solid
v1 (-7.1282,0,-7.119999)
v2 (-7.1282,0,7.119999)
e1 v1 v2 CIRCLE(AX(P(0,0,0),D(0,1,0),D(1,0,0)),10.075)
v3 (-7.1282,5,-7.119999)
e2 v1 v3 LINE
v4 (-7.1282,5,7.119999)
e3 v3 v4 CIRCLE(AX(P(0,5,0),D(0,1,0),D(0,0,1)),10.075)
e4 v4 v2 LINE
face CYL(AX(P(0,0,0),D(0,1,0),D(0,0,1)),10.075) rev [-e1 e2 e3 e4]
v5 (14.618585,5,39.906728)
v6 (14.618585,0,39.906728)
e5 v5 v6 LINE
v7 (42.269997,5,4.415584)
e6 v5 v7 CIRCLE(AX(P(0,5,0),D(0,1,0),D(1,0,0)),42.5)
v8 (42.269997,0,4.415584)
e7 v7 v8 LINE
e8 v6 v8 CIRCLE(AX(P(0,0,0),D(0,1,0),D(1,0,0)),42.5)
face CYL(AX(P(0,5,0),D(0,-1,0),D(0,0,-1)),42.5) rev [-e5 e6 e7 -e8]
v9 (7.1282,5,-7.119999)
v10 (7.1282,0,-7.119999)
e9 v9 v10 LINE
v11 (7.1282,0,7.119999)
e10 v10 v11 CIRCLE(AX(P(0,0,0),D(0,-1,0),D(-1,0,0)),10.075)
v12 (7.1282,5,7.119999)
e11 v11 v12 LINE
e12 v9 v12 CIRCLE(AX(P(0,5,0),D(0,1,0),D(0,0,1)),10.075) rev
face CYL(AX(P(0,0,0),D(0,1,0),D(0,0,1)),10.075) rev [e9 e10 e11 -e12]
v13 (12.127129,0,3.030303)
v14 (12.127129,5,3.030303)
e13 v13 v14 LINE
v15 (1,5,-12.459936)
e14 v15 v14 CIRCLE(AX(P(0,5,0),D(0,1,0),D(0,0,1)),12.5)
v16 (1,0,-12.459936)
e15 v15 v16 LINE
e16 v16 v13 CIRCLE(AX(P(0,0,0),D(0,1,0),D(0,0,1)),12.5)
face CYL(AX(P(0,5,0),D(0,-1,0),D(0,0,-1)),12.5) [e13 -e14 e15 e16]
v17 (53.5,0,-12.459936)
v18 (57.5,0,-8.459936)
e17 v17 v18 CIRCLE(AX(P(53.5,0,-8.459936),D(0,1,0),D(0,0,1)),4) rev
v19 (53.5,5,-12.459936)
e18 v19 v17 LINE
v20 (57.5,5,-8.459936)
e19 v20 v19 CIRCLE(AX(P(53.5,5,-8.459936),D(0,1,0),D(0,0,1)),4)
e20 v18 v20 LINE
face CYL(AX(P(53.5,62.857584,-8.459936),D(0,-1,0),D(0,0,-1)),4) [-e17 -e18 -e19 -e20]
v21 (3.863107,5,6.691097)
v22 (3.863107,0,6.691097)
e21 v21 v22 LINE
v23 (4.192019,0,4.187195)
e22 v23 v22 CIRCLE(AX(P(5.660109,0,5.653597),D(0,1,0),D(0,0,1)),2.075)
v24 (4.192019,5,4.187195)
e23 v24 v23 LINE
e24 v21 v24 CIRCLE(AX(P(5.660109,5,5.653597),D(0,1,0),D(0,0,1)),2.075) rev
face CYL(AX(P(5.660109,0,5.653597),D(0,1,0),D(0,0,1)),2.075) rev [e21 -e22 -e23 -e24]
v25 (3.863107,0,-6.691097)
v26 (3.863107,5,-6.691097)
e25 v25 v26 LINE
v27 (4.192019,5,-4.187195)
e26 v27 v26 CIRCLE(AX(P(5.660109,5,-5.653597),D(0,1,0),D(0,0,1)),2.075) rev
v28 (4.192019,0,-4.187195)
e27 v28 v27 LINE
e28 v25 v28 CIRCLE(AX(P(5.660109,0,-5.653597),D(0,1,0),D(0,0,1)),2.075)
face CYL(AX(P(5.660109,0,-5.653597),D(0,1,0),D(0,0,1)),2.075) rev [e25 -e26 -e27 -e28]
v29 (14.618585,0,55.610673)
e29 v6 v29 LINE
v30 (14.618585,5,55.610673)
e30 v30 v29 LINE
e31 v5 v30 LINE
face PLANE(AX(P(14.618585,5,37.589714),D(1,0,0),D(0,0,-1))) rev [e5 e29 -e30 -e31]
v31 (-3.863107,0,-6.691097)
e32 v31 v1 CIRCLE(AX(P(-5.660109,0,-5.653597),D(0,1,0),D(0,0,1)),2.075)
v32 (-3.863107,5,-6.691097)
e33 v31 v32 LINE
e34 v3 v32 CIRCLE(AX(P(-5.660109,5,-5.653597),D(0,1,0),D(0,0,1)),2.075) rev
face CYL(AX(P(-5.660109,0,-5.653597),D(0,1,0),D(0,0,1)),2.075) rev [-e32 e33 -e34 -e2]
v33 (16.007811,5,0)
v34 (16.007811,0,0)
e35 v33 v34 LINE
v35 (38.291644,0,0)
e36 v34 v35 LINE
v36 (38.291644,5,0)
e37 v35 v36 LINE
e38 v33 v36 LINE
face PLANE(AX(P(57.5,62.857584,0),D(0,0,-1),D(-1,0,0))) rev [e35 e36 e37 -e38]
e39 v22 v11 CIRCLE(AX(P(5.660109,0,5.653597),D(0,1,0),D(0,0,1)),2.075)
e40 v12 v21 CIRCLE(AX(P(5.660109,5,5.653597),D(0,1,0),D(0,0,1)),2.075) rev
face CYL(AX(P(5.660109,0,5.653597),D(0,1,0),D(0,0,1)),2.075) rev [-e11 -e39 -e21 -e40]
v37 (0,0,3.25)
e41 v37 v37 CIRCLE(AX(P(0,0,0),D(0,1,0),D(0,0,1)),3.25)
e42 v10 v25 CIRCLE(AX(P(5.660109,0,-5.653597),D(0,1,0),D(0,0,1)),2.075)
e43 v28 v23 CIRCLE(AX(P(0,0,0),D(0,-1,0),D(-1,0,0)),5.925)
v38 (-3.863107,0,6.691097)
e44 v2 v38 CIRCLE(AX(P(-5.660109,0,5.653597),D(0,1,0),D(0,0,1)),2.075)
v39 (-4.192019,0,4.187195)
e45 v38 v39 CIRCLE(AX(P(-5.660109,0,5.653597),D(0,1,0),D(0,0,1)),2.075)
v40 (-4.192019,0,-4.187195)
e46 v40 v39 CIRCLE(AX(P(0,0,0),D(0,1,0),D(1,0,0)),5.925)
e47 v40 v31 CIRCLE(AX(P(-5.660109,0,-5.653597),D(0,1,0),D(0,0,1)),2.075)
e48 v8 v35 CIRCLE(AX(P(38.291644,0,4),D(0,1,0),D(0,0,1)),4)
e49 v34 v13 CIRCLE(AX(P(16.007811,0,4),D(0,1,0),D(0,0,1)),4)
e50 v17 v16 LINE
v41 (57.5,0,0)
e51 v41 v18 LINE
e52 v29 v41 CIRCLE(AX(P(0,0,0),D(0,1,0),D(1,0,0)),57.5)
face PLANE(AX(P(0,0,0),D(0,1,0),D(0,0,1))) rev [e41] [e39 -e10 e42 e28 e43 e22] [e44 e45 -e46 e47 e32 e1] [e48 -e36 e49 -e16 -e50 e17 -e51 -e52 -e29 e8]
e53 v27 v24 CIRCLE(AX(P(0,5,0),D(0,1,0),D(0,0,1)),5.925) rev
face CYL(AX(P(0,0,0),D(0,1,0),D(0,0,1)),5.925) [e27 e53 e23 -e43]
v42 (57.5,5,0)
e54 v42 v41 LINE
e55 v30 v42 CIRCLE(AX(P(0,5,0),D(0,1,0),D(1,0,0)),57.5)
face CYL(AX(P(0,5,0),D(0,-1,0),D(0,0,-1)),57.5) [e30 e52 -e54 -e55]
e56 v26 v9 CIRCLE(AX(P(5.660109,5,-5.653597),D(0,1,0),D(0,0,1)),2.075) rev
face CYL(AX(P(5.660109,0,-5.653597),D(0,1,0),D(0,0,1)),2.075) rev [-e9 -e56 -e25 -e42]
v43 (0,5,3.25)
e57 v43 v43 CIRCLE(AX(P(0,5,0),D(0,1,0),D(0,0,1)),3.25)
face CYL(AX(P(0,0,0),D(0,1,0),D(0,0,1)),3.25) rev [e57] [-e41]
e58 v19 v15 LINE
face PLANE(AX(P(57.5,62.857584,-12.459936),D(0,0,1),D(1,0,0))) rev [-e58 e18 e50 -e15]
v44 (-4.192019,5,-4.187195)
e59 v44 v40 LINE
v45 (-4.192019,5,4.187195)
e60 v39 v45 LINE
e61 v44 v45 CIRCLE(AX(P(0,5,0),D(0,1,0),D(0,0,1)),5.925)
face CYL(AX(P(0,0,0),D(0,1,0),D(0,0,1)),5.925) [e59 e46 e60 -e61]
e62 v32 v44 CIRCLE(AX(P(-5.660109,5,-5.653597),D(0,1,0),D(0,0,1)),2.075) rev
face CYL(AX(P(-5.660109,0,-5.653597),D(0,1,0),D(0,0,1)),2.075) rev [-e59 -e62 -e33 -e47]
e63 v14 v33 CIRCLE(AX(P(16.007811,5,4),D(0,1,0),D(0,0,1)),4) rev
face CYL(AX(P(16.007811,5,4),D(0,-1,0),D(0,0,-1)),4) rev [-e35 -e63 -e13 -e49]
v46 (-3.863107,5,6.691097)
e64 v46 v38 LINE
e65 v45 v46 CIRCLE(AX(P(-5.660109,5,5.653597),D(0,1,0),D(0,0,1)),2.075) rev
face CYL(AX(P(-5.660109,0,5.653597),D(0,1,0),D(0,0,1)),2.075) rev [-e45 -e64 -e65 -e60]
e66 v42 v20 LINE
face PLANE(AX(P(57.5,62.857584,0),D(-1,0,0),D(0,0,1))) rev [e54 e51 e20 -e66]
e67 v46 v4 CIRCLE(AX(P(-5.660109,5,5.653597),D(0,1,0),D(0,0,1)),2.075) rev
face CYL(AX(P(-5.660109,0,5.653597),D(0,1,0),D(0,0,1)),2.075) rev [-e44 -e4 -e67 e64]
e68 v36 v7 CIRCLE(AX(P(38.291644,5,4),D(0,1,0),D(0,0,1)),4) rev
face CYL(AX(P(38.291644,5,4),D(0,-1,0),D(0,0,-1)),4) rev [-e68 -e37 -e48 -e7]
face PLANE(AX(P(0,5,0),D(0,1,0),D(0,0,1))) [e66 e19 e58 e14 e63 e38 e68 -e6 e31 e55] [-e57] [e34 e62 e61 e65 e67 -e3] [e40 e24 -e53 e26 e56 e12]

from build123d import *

# Parameters (mm, degrees)
SKETCH1_R               = 12.5
BOSS_EXTRUDE1_DEPTH     = 5
EXTRUDE_THIN1_DEPTH     = 5
SKETCH6_W               = 56.5
SKETCH6_H               = 12.459935794
BOSS_EXTRUDE3_DEPTH     = 5
CUT_EXTRUDE3_DEPTH      = 80.717487022
CUT_EXTRUDE3_DEPTH_BACK = 80.717487022
SKETCH7_R               = 3.25
CUT_EXTRUDE_THIN1_START = -5
CUT_EXTRUDE_THIN1_DEPTH = 85.717487022
FILLET1_R               = 2.075
FILLET2_R               = 4
BOSS_EXTRUDE4_DEPTH     = 5
SKETCH9_4_W             = 9.626496109
SKETCH9_4_H             = 23.122525611
CUT_EXTRUDE5_DEPTH      = 81.602542459


with BuildPart() as part:
    # Sketch1 → Boss-Extrude1 (new body)
    with BuildSketch(Plane(origin=(0, 0, 0), x_dir=(1, 0, 0), z_dir=(0, 1, 0))):
        with Locations(Location((0, 0, 0), (0, 0, 270))):
            Circle(SKETCH1_R)
    extrude(amount=BOSS_EXTRUDE1_DEPTH)



with BuildPart() as body_2:
    # Sketch4 → Extrude-Thin1 (new body)
    with BuildSketch(Plane(origin=(0, 0, 0), x_dir=(1, 0, 0), z_dir=(0, 1, 0))):
        with BuildLine():
            ThreePointArc((16.811373022, -54.987523468), (46.221769485, -34.202310238), (57.5, 0))
            Line((57.5, 0), (42.5, 0))
            ThreePointArc((42.5, 0), (34.163916576, -25.279968437), (12.425797451, -40.642952128))
            Line((12.425797451, -40.642952128), (16.811373022, -54.987523468))
        make_face()
    extrude(amount=EXTRUDE_THIN1_DEPTH)


with BuildPart() as part_1:
    add(part.part)

    add(body_2.part)  # Boss-Extrude3 merges body 2
    # Sketch6 → Boss-Extrude3 (add)
    with BuildSketch(Plane(origin=(0, 0, 0), x_dir=(1, 0, 0), z_dir=(0, 1, 0))):
        with Locations((29.25, 6.229967897)):
            Rectangle(SKETCH6_W, SKETCH6_H)
    extrude(amount=BOSS_EXTRUDE3_DEPTH)

    # Sketch7 → Cut-Extrude3 (cut, two sides: drawn at the far end of the back side and taken through both)
    with BuildSketch(Plane(origin=(0, 5, 0), x_dir=(1, 0, 0), z_dir=(0, 1, 0)).offset(-CUT_EXTRUDE3_DEPTH_BACK)):
        with Locations(Location((0, 0, 0), (0, 0, 270))):
            Circle(SKETCH7_R)
    extrude(amount=CUT_EXTRUDE3_DEPTH + CUT_EXTRUDE3_DEPTH_BACK, mode=Mode.SUBTRACT)

    # Sketch8 → Cut-Extrude-Thin1 (cut)
    with BuildSketch(Plane(origin=(0, 5, 0), x_dir=(1, 0, 0), z_dir=(0, 1, 0)).offset(CUT_EXTRUDE_THIN1_START)):
        with BuildLine():
            ThreePointArc((-5.0375, 8.725205943), (-10.075, 0), (-5.0375, -8.725205943))
            Line((-5.0375, -8.725205943), (-2.9625, -5.131200517))
            ThreePointArc((-2.9625, -5.131200517), (-5.925, 0), (-2.9625, 5.131200517))
            Line((-2.9625, 5.131200517), (-5.0375, 8.725205943))
        make_face()
    cut_extrude_thin1 = extrude(amount=CUT_EXTRUDE_THIN1_DEPTH, mode=Mode.SUBTRACT)

    # Mirror2: Cut-Extrude-Thin1 across plane
    add(cut_extrude_thin1.mirror(Plane(origin=(0, 0, 0), x_dir=(0, 0, 1), z_dir=(1, 0, 0))), mode=Mode.SUBTRACT)

    # Fillet1
    fillet1_edges = [part_1.edges().sort_by_distance(p)[0] for p in [
        (2.9625, 2.5, -5.131200517),
        (5.0375, 2.5, -8.725205943),
        (-5.0375, 2.5, -8.725205943),
        (-2.9625, 2.5, -5.131200517),
        (2.9625, 2.5, 5.131200517),
        (5.0375, 2.5, 8.725205943),
        (-5.0375, 2.5, 8.725205943),
        (-2.9625, 2.5, 5.131200517),
    ]]
    fillet(fillet1_edges, radius=FILLET1_R - 0.0001)  # a hair under: the kernel refuses the full size

    # Fillet2
    fillet2_edges = [part_1.edges().sort_by_distance(p)[0] for p in [
        (42.5, 2.5, 0),
        (12.5, 2.5, 0),
        (57.5, 2.5, -12.459935794),
    ]]
    fillet(fillet2_edges, radius=FILLET2_R)

    # Sketch9 → Boss-Extrude4 (add)
    with BuildSketch(Plane(origin=(0, 0, 0), x_dir=(1, 0, 0), z_dir=(0, 1, 0))):
        with BuildLine():
            Line((16.811373022, -54.987523468), (14.618585236, -47.815237798))
            Line((14.618585236, -47.815237798), (14.618585236, -55.610673128))
            ThreePointArc((14.618585236, -55.610673128), (15.718067562, -55.309966119), (16.811373022, -54.987523468))
        make_face()
        with BuildLine():
            Line((14.618585236, -47.815237798), (12.425797451, -40.642952128))
            Line((12.425797451, -40.642952128), (11.862973877, -56.262952738))
            ThreePointArc((11.862973877, -56.262952738), (13.244795598, -55.953779046), (14.618585236, -55.610673128))
            Line((14.618585236, -55.610673128), (14.618585236, -47.815237798))
        make_face()
    extrude(amount=BOSS_EXTRUDE4_DEPTH)

    # Sketch9<4> → Cut-Extrude5 (cut, through all)
    with BuildSketch(Plane(origin=(0, 0, 0), x_dir=(1, 0, 0), z_dir=(0, 1, 0))):
        with Locations((9.805337182, -49.150976699)):
            Rectangle(SKETCH9_4_W, SKETCH9_4_H)
    extrude(amount=CUT_EXTRUDE5_DEPTH, mode=Mode.SUBTRACT)


solid = part_1.part
